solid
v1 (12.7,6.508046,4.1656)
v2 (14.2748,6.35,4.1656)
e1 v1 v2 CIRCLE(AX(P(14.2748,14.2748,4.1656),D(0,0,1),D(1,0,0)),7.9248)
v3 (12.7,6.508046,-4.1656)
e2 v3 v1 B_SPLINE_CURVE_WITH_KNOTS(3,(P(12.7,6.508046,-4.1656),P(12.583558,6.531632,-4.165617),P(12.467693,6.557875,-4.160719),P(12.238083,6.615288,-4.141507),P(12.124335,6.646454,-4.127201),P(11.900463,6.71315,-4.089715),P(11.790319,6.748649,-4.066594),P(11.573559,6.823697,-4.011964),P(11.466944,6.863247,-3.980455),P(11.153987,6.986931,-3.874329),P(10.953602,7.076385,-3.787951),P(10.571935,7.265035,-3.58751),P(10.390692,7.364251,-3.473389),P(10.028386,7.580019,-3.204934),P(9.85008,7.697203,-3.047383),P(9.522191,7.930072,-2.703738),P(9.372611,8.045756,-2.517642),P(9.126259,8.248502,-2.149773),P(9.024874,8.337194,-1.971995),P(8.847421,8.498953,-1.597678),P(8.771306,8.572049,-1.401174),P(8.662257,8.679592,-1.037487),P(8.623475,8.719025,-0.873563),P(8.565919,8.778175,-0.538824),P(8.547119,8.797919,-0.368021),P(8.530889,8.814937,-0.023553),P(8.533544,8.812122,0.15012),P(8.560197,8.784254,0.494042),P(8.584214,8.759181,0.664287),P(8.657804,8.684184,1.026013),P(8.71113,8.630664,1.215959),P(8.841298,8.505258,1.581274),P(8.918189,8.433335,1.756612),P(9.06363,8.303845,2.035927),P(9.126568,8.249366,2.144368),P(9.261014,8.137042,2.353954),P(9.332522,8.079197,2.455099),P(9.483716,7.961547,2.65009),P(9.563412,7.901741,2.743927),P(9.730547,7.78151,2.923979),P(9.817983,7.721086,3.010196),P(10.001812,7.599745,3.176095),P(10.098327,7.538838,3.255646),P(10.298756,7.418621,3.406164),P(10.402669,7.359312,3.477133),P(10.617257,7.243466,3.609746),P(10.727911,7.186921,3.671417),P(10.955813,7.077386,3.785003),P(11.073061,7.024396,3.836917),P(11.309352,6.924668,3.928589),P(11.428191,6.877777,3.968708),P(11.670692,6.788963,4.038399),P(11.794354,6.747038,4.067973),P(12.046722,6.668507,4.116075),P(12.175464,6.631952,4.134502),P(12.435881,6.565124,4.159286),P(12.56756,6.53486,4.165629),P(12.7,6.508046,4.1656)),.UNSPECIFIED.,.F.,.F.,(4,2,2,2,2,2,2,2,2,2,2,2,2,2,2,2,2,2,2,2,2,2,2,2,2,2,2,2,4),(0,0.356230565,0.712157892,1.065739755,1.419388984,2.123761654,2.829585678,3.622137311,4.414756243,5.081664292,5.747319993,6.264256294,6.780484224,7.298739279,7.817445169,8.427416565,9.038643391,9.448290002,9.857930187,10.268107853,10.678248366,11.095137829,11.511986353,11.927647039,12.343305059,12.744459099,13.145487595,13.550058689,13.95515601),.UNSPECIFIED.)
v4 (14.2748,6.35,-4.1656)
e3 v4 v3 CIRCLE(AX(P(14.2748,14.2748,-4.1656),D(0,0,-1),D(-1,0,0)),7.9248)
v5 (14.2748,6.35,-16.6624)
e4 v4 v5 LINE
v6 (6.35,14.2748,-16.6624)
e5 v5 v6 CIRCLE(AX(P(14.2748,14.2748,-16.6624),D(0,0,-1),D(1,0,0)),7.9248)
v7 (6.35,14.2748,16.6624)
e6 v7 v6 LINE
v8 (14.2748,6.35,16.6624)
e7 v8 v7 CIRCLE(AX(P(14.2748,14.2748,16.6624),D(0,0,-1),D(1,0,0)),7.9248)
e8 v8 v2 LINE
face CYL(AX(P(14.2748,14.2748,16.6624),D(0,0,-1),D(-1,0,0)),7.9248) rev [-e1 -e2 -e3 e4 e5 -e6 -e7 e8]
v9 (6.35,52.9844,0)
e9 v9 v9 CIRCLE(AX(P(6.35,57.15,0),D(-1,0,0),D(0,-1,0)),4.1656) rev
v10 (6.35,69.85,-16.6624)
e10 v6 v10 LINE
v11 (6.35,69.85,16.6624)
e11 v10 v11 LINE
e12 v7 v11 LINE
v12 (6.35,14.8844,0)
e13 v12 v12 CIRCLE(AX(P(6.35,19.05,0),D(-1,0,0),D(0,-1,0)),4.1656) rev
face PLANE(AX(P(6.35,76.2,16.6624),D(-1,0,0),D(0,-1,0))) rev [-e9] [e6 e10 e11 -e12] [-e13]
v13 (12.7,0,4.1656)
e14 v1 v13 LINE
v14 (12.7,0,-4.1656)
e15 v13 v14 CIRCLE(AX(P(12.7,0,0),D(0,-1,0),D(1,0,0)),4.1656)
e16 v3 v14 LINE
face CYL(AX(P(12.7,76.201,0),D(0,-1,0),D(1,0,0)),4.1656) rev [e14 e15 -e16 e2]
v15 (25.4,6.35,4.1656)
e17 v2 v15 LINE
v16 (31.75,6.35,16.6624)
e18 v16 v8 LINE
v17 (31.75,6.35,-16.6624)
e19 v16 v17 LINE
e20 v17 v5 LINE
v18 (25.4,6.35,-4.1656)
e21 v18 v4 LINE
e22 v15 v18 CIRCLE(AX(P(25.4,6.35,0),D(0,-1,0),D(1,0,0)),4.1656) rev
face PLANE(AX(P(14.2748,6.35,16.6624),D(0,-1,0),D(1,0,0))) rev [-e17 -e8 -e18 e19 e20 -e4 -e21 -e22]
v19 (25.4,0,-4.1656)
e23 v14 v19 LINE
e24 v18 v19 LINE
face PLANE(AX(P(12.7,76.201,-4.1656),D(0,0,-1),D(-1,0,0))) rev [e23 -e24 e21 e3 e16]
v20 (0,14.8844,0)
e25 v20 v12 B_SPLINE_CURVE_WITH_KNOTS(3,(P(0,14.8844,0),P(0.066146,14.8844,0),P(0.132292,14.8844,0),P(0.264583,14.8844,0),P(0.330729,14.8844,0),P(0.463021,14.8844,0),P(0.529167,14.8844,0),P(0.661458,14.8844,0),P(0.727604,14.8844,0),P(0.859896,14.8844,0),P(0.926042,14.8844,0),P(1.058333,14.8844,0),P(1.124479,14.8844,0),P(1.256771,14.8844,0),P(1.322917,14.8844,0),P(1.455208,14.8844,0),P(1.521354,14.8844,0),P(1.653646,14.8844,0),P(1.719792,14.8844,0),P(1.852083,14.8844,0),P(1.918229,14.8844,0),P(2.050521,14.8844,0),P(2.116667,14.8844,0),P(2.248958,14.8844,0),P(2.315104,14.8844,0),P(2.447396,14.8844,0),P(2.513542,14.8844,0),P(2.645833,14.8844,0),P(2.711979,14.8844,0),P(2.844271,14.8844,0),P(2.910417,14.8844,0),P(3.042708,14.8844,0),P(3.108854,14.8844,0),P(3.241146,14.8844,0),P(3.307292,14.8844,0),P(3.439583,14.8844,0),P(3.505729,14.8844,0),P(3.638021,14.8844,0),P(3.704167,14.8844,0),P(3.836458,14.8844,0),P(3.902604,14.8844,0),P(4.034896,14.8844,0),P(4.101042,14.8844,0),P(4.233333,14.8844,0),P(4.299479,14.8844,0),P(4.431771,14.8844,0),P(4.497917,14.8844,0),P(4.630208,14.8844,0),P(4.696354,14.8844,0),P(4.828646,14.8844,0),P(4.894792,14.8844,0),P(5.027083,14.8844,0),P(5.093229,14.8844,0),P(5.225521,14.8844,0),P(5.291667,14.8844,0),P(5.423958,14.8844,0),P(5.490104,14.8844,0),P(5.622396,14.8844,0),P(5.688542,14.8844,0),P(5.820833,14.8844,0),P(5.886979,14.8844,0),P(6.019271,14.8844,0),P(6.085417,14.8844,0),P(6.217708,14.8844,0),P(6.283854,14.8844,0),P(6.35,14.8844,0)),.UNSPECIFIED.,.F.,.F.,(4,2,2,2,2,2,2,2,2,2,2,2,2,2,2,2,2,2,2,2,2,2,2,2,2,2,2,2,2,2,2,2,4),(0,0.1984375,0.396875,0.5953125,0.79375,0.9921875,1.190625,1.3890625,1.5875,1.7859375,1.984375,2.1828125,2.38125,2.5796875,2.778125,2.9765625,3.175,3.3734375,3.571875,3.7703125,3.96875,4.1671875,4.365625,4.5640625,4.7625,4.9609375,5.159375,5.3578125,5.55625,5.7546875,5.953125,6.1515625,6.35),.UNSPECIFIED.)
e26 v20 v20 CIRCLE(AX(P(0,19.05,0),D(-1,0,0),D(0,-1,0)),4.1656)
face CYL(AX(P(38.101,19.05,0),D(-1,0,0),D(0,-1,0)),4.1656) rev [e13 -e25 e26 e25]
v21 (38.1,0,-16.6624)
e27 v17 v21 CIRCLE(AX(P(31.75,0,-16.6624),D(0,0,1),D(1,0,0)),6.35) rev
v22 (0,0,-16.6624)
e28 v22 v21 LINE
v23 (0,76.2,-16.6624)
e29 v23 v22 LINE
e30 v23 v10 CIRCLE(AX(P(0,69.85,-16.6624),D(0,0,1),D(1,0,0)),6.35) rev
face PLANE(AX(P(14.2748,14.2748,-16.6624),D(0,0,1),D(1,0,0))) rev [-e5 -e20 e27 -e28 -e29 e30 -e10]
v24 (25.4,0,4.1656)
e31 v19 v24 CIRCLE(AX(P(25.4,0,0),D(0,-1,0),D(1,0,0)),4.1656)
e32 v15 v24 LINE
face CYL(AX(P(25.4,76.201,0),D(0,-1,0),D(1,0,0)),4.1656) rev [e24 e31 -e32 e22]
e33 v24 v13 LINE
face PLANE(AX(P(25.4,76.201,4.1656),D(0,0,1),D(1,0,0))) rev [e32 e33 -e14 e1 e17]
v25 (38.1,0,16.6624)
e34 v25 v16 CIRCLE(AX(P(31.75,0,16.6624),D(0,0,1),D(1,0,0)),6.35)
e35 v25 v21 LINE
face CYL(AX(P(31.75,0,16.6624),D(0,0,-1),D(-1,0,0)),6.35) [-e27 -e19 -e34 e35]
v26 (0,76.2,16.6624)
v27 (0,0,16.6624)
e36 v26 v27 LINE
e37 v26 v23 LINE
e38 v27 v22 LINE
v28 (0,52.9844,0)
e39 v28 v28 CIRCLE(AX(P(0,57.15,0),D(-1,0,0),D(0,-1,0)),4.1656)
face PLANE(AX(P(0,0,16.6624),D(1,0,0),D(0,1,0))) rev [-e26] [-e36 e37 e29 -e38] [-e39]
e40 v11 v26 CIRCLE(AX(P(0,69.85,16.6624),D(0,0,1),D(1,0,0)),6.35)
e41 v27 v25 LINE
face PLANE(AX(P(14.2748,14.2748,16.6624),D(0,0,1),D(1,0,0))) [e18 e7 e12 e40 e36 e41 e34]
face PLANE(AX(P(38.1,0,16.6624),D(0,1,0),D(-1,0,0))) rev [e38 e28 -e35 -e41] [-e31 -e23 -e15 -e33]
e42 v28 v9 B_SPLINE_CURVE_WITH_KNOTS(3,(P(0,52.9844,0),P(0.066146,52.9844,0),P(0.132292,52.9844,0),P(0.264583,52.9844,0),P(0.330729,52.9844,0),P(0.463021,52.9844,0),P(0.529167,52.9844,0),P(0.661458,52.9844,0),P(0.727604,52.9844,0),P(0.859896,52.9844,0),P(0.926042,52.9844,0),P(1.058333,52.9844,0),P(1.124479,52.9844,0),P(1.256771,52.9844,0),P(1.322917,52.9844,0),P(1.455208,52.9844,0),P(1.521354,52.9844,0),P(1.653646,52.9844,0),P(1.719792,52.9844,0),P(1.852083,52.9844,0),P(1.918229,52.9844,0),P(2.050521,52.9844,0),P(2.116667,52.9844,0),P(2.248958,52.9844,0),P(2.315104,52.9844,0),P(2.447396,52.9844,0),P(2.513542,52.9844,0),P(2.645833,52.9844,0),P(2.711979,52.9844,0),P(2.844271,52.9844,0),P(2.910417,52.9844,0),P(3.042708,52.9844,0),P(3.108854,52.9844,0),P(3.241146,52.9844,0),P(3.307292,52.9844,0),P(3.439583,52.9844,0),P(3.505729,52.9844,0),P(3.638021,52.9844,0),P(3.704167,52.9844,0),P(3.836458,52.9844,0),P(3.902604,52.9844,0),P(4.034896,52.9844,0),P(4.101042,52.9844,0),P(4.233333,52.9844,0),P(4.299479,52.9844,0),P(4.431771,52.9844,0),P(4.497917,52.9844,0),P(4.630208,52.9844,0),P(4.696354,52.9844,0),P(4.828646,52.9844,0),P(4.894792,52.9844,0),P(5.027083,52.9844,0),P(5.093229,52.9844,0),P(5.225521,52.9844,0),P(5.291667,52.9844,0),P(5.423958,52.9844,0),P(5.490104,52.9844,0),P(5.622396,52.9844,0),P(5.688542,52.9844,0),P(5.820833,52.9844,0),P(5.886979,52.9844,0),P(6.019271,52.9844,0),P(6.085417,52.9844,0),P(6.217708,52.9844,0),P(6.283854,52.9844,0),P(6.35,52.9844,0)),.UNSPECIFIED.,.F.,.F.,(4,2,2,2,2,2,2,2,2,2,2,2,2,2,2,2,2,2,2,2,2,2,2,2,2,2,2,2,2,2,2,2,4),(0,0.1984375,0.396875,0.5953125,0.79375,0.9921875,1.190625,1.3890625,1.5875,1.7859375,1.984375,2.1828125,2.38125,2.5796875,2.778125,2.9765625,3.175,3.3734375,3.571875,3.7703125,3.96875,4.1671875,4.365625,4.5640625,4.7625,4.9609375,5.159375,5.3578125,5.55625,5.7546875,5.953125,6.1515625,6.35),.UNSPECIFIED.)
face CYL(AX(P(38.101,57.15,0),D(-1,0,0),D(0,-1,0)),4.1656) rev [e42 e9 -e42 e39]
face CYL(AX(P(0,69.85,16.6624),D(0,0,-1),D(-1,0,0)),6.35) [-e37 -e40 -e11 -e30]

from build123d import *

# Parameters (mm, degrees)
BOSS_EXTRUDE1_DEPTH = 16.6624
FILLET1_R           = 6.35
CUT_EXTRUDE1_REACH  = 88.808
SKETCH3_R           = 4.1656
CUT_EXTRUDE2_REACH  = 88.808


with BuildPart() as part:
    # Sketch2 → Boss-Extrude1 (new, symmetric)
    with BuildSketch(Plane.XY):
        with BuildLine():
            Line((0, 0), (0, 76.2))
            Line((0, 76.2), (6.35, 76.2))
            Line((6.35, 76.2), (6.35, 14.2748))
            ThreePointArc((6.35, 14.2748), (8.67112018, 8.67112018), (14.2748, 6.35))
            Line((14.2748, 6.35), (38.1, 6.35))
            Line((38.1, 6.35), (38.1, 0))
            Line((38.1, 0), (0, 0))
        make_face()
    extrude(amount=BOSS_EXTRUDE1_DEPTH, both=True)

    # Fillet1
    fillet1_edges = [part.edges().sort_by_distance(p)[0] for p in [
        (38.1, 6.35, 0),
        (6.35, 76.2, 0),
    ]]
    fillet(fillet1_edges, radius=FILLET1_R - 0.0001)  # a hair under: the kernel refuses the full size

    # Sketch3 → Cut-Extrude1 (cut, up to next)
    with BuildSketch(Plane.ZY, mode=Mode.PRIVATE) as cut_extrude1_sk1:
        with Locations(Location((0, 57.15, 0), (0, 0, 270))):
            Circle(SKETCH3_R)
    cut_extrude1_tool1 = extrude(cut_extrude1_sk1.sketch, amount=-CUT_EXTRUDE1_REACH, mode=Mode.PRIVATE) & part.part
    # Sketch3 → Cut-Extrude1 (cut, up to next)
    with BuildSketch(Plane.ZY, mode=Mode.PRIVATE) as cut_extrude1_sk2:
        with Locations(Location((0, 19.05, 0), (0, 0, 270))):
            Circle(SKETCH3_R)
    cut_extrude1_tool2 = extrude(cut_extrude1_sk2.sketch, amount=-CUT_EXTRUDE1_REACH, mode=Mode.PRIVATE) & part.part
    add(cut_extrude1_tool1.solids().sort_by_distance((0, 57.15, 0))[0], mode=Mode.SUBTRACT)
    add(cut_extrude1_tool2.solids().sort_by_distance((0, 19.05, 0))[0], mode=Mode.SUBTRACT)

    # Sketch4 → Cut-Extrude2 (cut, up to next)
    with BuildSketch(Plane.XZ, mode=Mode.PRIVATE) as cut_extrude2_sk1:
        with BuildLine():
            Line((25.4, 4.1656), (12.7, 4.1656))
            ThreePointArc((12.7, 4.1656), (8.5344, 0), (12.7, -4.1656))
            Line((12.7, -4.1656), (25.4, -4.1656))
            ThreePointArc((25.4, -4.1656), (29.5656, 0), (25.4, 4.1656))
        make_face()
    cut_extrude2_tool1 = extrude(cut_extrude2_sk1.sketch, amount=-CUT_EXTRUDE2_REACH, mode=Mode.PRIVATE) & part.part
    add(cut_extrude2_tool1.solids().sort_by_distance((19.05, 0, 0))[0], mode=Mode.SUBTRACT)


solid = part.part
